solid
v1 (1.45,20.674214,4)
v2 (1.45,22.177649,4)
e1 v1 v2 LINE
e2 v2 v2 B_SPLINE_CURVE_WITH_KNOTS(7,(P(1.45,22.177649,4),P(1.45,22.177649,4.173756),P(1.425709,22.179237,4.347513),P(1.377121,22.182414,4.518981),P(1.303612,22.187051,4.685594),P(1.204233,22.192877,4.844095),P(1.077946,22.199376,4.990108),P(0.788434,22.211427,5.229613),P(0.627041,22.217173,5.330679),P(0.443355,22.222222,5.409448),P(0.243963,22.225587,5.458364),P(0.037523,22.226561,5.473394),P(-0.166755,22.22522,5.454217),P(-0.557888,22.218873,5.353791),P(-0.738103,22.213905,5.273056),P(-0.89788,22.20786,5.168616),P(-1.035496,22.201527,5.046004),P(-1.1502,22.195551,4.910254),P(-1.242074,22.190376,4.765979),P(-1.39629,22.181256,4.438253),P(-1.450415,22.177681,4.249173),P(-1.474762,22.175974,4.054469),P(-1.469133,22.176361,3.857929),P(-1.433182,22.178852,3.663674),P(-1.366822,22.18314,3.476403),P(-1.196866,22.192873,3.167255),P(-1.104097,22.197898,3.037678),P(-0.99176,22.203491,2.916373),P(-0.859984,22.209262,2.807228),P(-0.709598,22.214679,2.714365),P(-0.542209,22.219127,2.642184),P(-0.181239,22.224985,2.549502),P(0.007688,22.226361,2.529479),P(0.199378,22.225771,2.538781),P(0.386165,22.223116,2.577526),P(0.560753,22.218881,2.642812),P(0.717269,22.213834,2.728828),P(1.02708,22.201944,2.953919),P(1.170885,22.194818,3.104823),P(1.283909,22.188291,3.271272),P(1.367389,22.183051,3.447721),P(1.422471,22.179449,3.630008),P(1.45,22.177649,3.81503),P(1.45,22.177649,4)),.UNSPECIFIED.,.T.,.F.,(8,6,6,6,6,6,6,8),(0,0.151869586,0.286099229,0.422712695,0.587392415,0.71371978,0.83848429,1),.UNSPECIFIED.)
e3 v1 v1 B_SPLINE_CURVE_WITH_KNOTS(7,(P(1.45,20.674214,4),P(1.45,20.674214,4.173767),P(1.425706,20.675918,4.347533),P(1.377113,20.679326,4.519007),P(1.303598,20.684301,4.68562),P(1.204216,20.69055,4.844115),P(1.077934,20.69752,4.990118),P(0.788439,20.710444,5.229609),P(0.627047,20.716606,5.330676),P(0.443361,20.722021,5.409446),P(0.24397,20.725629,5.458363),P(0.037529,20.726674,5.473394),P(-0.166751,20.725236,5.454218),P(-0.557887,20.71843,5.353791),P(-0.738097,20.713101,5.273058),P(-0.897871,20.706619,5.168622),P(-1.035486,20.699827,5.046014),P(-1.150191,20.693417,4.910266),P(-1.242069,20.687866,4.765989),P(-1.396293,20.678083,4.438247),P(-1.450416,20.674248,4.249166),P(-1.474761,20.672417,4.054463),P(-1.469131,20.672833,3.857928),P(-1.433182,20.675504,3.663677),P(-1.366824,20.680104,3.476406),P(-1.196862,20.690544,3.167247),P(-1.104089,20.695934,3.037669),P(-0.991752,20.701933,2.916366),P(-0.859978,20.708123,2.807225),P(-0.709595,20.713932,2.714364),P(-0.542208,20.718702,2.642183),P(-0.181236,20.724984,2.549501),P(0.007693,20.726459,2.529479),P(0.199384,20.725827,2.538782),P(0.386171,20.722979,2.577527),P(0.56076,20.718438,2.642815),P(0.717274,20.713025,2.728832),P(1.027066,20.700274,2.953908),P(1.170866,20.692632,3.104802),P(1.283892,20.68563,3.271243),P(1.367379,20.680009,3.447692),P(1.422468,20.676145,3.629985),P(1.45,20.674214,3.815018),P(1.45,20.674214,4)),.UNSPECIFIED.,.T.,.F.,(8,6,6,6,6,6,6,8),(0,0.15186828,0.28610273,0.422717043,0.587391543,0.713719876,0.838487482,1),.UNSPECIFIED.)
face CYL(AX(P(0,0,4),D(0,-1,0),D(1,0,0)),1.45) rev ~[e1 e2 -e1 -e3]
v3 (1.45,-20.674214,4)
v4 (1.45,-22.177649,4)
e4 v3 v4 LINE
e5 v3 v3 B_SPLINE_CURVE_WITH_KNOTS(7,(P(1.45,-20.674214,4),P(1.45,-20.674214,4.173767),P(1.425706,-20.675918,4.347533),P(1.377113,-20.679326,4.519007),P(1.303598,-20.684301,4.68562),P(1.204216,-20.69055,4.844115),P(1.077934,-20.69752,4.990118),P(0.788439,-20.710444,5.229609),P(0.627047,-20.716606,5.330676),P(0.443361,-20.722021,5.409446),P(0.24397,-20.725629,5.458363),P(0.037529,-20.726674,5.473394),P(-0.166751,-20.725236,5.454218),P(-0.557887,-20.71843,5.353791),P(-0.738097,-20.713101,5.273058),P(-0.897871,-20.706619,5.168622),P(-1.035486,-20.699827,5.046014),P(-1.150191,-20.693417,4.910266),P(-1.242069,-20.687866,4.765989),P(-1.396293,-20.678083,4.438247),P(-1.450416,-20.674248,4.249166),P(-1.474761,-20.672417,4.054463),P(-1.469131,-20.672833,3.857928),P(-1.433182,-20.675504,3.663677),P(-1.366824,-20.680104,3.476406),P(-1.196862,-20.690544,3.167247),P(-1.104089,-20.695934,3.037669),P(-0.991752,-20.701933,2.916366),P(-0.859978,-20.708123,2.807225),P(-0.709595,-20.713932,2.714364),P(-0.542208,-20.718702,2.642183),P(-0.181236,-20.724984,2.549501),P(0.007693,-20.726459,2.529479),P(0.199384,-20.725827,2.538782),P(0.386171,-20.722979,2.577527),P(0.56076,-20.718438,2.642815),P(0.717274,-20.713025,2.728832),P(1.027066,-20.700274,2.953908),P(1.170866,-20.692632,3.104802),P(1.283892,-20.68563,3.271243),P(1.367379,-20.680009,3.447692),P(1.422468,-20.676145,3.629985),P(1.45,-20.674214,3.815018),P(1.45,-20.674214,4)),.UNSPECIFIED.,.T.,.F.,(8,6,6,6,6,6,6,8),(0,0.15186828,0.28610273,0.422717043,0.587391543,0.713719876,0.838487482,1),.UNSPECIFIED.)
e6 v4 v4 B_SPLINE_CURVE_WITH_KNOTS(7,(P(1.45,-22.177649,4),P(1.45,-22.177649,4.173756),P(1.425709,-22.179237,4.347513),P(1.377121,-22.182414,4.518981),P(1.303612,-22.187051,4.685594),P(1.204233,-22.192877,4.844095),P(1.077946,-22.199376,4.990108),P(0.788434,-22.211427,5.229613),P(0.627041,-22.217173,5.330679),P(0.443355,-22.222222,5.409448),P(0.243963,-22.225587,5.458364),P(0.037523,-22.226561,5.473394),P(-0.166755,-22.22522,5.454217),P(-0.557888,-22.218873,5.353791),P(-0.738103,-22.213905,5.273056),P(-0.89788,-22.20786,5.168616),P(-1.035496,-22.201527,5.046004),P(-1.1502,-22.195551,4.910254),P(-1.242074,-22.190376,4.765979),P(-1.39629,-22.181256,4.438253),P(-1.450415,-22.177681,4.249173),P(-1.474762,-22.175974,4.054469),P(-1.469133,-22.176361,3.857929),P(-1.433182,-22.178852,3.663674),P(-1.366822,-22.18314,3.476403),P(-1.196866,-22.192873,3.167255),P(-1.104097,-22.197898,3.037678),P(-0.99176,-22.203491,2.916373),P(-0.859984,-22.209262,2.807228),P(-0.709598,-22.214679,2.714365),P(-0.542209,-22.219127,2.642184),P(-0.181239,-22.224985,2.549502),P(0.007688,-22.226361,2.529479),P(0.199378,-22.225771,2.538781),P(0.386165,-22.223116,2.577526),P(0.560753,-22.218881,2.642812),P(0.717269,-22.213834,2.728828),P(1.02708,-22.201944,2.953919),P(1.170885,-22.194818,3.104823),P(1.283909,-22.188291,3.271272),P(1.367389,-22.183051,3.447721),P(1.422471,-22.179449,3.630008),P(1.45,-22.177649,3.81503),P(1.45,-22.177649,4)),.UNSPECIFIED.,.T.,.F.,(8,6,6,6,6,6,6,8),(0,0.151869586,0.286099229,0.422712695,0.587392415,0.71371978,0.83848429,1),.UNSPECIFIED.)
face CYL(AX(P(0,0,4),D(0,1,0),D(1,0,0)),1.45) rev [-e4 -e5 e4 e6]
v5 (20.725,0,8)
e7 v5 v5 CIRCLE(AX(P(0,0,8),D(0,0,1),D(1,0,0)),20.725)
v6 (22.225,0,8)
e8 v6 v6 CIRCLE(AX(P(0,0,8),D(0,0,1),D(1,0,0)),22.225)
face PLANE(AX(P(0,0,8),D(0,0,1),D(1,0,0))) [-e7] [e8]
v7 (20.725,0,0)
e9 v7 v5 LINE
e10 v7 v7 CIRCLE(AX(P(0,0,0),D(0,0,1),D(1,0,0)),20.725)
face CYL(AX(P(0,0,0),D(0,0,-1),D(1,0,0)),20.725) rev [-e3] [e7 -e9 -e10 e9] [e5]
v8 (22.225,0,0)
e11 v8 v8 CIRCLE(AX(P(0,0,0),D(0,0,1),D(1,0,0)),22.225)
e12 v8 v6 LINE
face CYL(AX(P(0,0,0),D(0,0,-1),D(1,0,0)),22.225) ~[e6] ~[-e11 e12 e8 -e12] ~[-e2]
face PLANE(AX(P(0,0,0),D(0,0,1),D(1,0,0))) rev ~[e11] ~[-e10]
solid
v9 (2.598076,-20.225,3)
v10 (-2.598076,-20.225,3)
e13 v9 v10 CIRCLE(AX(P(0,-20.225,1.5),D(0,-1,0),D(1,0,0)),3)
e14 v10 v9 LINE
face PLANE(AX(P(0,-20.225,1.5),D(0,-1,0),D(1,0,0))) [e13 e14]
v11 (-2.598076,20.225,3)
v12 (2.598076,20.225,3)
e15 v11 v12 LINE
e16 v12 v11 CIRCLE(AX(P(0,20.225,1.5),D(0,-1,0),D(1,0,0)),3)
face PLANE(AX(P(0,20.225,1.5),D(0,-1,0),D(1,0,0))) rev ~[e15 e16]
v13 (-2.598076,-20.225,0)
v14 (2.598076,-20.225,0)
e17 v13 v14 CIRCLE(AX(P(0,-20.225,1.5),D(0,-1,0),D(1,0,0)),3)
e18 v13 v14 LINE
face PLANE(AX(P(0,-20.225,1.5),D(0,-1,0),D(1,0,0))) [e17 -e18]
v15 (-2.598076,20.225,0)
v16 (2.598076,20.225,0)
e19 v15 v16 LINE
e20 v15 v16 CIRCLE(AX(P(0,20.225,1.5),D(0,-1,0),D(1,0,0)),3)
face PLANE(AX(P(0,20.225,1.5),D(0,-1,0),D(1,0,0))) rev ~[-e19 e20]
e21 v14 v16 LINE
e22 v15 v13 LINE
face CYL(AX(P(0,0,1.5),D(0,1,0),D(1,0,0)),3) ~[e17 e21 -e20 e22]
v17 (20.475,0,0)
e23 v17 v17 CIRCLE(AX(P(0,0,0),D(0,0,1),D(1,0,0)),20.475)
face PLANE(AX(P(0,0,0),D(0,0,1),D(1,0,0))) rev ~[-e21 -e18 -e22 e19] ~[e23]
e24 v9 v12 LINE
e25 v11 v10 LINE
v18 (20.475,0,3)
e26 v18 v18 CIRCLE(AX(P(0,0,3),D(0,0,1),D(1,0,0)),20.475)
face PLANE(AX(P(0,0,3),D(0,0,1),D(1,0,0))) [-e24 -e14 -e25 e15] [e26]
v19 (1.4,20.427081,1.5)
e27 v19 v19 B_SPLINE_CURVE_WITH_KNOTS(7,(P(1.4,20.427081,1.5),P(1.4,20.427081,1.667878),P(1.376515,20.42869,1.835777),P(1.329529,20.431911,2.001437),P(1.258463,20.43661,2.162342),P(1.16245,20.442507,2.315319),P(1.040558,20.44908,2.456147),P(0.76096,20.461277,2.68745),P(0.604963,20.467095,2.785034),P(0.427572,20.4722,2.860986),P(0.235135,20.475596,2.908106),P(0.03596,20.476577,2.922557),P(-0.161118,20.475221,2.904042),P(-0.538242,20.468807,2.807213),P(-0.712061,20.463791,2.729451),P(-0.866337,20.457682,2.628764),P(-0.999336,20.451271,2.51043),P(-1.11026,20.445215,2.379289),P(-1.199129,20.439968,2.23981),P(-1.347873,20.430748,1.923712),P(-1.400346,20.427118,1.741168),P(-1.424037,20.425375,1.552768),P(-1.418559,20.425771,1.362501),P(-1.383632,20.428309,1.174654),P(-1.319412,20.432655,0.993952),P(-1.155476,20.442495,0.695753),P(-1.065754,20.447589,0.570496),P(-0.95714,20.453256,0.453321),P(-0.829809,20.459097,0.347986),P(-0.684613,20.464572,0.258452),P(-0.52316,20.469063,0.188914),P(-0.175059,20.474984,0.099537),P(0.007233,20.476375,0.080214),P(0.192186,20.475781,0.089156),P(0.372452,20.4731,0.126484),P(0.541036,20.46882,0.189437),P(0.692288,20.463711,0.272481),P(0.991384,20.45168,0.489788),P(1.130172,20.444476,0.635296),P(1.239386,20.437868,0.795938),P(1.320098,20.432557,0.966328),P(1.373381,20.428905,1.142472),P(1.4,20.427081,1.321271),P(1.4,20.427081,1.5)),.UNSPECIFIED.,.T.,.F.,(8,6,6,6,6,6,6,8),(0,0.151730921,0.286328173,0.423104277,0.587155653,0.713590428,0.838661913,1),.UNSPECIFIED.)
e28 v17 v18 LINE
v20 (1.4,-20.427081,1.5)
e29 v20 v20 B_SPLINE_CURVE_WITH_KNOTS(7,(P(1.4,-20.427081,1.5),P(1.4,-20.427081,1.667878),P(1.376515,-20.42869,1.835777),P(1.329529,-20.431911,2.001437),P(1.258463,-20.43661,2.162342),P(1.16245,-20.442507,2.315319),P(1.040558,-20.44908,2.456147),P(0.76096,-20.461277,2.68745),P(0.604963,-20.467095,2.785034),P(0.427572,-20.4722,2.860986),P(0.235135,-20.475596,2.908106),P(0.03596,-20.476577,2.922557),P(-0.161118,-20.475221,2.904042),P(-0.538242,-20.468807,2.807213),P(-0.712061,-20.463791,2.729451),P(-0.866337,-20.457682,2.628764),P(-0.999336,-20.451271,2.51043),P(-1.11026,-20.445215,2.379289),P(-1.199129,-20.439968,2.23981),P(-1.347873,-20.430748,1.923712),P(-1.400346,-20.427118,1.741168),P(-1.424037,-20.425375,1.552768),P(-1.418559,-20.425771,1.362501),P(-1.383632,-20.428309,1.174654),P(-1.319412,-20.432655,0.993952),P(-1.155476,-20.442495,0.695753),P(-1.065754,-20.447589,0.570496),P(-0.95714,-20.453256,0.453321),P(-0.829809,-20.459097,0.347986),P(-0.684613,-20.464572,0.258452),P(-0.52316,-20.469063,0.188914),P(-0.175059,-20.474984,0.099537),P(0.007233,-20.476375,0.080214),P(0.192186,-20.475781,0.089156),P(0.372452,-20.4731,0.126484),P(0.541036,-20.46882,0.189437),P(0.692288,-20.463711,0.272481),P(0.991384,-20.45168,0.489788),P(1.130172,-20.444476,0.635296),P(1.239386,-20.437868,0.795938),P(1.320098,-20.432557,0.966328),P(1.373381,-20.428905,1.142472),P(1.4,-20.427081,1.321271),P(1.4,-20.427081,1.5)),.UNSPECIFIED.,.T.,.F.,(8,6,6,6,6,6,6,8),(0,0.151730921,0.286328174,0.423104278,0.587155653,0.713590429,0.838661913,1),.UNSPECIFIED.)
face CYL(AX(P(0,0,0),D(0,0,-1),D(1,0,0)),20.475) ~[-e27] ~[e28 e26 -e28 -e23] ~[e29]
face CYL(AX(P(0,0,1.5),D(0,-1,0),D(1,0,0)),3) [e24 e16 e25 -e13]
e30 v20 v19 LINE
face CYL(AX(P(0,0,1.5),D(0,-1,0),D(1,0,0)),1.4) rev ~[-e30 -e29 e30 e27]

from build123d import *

# Parameters (mm, degrees)
F0_R          = 22.225
F0_R_2        = 20.725
F1_DEPTH      = 8
F0_R_3        = 20.475
F2_DEPTH      = 3
F3_R          = 3
F4_DEPTH      = 20.225
F4_DEPTH_BACK = 20.225
F5_R          = 1.45
F6_DEPTH      = 22.226
F6_DEPTH_BACK = 22.226
F7_R          = 1.4
F8_DEPTH      = 22.2260001181
F8_DEPTH_BACK = 22.2260001181


with BuildPart() as f1:
    # F0 (on Top) → F1 (new body)
    with BuildSketch(Plane.XY):
        Circle(F0_R)
        Circle(F0_R_2, mode=Mode.SUBTRACT)
    extrude(amount=F1_DEPTH)

    # F5 (on Front) → F6 (cut, two sides)
    with BuildSketch(Plane.XZ) as f6_sk:
        with Locations((0, 4)):
            Circle(F5_R)
    extrude(amount=-F6_DEPTH, mode=Mode.SUBTRACT)
    extrude(f6_sk.sketch, amount=F6_DEPTH_BACK, mode=Mode.SUBTRACT)


with BuildPart() as f2:
    # F0 (on Top) → F2 (new body)
    with BuildSketch(Plane.XY):
        Circle(F0_R_3)
    extrude(amount=F2_DEPTH)

    # F3 (on Front) → F4 (join, two sides)
    with BuildSketch(Plane.XZ) as f4_sk:
        with Locations((0, 1.5)):
            Circle(F3_R)
    extrude(amount=F4_DEPTH)
    extrude(f4_sk.sketch, amount=-F4_DEPTH_BACK)

    # F7 (on Front) → F8 (cut, two sides)
    with BuildSketch(Plane.XZ) as f8_sk:
        with Locations((0, 1.5)):
            Circle(F7_R)
    extrude(amount=-F8_DEPTH, mode=Mode.SUBTRACT)
    extrude(f8_sk.sketch, amount=F8_DEPTH_BACK, mode=Mode.SUBTRACT)


solid = Compound([f1.part, f2.part])
